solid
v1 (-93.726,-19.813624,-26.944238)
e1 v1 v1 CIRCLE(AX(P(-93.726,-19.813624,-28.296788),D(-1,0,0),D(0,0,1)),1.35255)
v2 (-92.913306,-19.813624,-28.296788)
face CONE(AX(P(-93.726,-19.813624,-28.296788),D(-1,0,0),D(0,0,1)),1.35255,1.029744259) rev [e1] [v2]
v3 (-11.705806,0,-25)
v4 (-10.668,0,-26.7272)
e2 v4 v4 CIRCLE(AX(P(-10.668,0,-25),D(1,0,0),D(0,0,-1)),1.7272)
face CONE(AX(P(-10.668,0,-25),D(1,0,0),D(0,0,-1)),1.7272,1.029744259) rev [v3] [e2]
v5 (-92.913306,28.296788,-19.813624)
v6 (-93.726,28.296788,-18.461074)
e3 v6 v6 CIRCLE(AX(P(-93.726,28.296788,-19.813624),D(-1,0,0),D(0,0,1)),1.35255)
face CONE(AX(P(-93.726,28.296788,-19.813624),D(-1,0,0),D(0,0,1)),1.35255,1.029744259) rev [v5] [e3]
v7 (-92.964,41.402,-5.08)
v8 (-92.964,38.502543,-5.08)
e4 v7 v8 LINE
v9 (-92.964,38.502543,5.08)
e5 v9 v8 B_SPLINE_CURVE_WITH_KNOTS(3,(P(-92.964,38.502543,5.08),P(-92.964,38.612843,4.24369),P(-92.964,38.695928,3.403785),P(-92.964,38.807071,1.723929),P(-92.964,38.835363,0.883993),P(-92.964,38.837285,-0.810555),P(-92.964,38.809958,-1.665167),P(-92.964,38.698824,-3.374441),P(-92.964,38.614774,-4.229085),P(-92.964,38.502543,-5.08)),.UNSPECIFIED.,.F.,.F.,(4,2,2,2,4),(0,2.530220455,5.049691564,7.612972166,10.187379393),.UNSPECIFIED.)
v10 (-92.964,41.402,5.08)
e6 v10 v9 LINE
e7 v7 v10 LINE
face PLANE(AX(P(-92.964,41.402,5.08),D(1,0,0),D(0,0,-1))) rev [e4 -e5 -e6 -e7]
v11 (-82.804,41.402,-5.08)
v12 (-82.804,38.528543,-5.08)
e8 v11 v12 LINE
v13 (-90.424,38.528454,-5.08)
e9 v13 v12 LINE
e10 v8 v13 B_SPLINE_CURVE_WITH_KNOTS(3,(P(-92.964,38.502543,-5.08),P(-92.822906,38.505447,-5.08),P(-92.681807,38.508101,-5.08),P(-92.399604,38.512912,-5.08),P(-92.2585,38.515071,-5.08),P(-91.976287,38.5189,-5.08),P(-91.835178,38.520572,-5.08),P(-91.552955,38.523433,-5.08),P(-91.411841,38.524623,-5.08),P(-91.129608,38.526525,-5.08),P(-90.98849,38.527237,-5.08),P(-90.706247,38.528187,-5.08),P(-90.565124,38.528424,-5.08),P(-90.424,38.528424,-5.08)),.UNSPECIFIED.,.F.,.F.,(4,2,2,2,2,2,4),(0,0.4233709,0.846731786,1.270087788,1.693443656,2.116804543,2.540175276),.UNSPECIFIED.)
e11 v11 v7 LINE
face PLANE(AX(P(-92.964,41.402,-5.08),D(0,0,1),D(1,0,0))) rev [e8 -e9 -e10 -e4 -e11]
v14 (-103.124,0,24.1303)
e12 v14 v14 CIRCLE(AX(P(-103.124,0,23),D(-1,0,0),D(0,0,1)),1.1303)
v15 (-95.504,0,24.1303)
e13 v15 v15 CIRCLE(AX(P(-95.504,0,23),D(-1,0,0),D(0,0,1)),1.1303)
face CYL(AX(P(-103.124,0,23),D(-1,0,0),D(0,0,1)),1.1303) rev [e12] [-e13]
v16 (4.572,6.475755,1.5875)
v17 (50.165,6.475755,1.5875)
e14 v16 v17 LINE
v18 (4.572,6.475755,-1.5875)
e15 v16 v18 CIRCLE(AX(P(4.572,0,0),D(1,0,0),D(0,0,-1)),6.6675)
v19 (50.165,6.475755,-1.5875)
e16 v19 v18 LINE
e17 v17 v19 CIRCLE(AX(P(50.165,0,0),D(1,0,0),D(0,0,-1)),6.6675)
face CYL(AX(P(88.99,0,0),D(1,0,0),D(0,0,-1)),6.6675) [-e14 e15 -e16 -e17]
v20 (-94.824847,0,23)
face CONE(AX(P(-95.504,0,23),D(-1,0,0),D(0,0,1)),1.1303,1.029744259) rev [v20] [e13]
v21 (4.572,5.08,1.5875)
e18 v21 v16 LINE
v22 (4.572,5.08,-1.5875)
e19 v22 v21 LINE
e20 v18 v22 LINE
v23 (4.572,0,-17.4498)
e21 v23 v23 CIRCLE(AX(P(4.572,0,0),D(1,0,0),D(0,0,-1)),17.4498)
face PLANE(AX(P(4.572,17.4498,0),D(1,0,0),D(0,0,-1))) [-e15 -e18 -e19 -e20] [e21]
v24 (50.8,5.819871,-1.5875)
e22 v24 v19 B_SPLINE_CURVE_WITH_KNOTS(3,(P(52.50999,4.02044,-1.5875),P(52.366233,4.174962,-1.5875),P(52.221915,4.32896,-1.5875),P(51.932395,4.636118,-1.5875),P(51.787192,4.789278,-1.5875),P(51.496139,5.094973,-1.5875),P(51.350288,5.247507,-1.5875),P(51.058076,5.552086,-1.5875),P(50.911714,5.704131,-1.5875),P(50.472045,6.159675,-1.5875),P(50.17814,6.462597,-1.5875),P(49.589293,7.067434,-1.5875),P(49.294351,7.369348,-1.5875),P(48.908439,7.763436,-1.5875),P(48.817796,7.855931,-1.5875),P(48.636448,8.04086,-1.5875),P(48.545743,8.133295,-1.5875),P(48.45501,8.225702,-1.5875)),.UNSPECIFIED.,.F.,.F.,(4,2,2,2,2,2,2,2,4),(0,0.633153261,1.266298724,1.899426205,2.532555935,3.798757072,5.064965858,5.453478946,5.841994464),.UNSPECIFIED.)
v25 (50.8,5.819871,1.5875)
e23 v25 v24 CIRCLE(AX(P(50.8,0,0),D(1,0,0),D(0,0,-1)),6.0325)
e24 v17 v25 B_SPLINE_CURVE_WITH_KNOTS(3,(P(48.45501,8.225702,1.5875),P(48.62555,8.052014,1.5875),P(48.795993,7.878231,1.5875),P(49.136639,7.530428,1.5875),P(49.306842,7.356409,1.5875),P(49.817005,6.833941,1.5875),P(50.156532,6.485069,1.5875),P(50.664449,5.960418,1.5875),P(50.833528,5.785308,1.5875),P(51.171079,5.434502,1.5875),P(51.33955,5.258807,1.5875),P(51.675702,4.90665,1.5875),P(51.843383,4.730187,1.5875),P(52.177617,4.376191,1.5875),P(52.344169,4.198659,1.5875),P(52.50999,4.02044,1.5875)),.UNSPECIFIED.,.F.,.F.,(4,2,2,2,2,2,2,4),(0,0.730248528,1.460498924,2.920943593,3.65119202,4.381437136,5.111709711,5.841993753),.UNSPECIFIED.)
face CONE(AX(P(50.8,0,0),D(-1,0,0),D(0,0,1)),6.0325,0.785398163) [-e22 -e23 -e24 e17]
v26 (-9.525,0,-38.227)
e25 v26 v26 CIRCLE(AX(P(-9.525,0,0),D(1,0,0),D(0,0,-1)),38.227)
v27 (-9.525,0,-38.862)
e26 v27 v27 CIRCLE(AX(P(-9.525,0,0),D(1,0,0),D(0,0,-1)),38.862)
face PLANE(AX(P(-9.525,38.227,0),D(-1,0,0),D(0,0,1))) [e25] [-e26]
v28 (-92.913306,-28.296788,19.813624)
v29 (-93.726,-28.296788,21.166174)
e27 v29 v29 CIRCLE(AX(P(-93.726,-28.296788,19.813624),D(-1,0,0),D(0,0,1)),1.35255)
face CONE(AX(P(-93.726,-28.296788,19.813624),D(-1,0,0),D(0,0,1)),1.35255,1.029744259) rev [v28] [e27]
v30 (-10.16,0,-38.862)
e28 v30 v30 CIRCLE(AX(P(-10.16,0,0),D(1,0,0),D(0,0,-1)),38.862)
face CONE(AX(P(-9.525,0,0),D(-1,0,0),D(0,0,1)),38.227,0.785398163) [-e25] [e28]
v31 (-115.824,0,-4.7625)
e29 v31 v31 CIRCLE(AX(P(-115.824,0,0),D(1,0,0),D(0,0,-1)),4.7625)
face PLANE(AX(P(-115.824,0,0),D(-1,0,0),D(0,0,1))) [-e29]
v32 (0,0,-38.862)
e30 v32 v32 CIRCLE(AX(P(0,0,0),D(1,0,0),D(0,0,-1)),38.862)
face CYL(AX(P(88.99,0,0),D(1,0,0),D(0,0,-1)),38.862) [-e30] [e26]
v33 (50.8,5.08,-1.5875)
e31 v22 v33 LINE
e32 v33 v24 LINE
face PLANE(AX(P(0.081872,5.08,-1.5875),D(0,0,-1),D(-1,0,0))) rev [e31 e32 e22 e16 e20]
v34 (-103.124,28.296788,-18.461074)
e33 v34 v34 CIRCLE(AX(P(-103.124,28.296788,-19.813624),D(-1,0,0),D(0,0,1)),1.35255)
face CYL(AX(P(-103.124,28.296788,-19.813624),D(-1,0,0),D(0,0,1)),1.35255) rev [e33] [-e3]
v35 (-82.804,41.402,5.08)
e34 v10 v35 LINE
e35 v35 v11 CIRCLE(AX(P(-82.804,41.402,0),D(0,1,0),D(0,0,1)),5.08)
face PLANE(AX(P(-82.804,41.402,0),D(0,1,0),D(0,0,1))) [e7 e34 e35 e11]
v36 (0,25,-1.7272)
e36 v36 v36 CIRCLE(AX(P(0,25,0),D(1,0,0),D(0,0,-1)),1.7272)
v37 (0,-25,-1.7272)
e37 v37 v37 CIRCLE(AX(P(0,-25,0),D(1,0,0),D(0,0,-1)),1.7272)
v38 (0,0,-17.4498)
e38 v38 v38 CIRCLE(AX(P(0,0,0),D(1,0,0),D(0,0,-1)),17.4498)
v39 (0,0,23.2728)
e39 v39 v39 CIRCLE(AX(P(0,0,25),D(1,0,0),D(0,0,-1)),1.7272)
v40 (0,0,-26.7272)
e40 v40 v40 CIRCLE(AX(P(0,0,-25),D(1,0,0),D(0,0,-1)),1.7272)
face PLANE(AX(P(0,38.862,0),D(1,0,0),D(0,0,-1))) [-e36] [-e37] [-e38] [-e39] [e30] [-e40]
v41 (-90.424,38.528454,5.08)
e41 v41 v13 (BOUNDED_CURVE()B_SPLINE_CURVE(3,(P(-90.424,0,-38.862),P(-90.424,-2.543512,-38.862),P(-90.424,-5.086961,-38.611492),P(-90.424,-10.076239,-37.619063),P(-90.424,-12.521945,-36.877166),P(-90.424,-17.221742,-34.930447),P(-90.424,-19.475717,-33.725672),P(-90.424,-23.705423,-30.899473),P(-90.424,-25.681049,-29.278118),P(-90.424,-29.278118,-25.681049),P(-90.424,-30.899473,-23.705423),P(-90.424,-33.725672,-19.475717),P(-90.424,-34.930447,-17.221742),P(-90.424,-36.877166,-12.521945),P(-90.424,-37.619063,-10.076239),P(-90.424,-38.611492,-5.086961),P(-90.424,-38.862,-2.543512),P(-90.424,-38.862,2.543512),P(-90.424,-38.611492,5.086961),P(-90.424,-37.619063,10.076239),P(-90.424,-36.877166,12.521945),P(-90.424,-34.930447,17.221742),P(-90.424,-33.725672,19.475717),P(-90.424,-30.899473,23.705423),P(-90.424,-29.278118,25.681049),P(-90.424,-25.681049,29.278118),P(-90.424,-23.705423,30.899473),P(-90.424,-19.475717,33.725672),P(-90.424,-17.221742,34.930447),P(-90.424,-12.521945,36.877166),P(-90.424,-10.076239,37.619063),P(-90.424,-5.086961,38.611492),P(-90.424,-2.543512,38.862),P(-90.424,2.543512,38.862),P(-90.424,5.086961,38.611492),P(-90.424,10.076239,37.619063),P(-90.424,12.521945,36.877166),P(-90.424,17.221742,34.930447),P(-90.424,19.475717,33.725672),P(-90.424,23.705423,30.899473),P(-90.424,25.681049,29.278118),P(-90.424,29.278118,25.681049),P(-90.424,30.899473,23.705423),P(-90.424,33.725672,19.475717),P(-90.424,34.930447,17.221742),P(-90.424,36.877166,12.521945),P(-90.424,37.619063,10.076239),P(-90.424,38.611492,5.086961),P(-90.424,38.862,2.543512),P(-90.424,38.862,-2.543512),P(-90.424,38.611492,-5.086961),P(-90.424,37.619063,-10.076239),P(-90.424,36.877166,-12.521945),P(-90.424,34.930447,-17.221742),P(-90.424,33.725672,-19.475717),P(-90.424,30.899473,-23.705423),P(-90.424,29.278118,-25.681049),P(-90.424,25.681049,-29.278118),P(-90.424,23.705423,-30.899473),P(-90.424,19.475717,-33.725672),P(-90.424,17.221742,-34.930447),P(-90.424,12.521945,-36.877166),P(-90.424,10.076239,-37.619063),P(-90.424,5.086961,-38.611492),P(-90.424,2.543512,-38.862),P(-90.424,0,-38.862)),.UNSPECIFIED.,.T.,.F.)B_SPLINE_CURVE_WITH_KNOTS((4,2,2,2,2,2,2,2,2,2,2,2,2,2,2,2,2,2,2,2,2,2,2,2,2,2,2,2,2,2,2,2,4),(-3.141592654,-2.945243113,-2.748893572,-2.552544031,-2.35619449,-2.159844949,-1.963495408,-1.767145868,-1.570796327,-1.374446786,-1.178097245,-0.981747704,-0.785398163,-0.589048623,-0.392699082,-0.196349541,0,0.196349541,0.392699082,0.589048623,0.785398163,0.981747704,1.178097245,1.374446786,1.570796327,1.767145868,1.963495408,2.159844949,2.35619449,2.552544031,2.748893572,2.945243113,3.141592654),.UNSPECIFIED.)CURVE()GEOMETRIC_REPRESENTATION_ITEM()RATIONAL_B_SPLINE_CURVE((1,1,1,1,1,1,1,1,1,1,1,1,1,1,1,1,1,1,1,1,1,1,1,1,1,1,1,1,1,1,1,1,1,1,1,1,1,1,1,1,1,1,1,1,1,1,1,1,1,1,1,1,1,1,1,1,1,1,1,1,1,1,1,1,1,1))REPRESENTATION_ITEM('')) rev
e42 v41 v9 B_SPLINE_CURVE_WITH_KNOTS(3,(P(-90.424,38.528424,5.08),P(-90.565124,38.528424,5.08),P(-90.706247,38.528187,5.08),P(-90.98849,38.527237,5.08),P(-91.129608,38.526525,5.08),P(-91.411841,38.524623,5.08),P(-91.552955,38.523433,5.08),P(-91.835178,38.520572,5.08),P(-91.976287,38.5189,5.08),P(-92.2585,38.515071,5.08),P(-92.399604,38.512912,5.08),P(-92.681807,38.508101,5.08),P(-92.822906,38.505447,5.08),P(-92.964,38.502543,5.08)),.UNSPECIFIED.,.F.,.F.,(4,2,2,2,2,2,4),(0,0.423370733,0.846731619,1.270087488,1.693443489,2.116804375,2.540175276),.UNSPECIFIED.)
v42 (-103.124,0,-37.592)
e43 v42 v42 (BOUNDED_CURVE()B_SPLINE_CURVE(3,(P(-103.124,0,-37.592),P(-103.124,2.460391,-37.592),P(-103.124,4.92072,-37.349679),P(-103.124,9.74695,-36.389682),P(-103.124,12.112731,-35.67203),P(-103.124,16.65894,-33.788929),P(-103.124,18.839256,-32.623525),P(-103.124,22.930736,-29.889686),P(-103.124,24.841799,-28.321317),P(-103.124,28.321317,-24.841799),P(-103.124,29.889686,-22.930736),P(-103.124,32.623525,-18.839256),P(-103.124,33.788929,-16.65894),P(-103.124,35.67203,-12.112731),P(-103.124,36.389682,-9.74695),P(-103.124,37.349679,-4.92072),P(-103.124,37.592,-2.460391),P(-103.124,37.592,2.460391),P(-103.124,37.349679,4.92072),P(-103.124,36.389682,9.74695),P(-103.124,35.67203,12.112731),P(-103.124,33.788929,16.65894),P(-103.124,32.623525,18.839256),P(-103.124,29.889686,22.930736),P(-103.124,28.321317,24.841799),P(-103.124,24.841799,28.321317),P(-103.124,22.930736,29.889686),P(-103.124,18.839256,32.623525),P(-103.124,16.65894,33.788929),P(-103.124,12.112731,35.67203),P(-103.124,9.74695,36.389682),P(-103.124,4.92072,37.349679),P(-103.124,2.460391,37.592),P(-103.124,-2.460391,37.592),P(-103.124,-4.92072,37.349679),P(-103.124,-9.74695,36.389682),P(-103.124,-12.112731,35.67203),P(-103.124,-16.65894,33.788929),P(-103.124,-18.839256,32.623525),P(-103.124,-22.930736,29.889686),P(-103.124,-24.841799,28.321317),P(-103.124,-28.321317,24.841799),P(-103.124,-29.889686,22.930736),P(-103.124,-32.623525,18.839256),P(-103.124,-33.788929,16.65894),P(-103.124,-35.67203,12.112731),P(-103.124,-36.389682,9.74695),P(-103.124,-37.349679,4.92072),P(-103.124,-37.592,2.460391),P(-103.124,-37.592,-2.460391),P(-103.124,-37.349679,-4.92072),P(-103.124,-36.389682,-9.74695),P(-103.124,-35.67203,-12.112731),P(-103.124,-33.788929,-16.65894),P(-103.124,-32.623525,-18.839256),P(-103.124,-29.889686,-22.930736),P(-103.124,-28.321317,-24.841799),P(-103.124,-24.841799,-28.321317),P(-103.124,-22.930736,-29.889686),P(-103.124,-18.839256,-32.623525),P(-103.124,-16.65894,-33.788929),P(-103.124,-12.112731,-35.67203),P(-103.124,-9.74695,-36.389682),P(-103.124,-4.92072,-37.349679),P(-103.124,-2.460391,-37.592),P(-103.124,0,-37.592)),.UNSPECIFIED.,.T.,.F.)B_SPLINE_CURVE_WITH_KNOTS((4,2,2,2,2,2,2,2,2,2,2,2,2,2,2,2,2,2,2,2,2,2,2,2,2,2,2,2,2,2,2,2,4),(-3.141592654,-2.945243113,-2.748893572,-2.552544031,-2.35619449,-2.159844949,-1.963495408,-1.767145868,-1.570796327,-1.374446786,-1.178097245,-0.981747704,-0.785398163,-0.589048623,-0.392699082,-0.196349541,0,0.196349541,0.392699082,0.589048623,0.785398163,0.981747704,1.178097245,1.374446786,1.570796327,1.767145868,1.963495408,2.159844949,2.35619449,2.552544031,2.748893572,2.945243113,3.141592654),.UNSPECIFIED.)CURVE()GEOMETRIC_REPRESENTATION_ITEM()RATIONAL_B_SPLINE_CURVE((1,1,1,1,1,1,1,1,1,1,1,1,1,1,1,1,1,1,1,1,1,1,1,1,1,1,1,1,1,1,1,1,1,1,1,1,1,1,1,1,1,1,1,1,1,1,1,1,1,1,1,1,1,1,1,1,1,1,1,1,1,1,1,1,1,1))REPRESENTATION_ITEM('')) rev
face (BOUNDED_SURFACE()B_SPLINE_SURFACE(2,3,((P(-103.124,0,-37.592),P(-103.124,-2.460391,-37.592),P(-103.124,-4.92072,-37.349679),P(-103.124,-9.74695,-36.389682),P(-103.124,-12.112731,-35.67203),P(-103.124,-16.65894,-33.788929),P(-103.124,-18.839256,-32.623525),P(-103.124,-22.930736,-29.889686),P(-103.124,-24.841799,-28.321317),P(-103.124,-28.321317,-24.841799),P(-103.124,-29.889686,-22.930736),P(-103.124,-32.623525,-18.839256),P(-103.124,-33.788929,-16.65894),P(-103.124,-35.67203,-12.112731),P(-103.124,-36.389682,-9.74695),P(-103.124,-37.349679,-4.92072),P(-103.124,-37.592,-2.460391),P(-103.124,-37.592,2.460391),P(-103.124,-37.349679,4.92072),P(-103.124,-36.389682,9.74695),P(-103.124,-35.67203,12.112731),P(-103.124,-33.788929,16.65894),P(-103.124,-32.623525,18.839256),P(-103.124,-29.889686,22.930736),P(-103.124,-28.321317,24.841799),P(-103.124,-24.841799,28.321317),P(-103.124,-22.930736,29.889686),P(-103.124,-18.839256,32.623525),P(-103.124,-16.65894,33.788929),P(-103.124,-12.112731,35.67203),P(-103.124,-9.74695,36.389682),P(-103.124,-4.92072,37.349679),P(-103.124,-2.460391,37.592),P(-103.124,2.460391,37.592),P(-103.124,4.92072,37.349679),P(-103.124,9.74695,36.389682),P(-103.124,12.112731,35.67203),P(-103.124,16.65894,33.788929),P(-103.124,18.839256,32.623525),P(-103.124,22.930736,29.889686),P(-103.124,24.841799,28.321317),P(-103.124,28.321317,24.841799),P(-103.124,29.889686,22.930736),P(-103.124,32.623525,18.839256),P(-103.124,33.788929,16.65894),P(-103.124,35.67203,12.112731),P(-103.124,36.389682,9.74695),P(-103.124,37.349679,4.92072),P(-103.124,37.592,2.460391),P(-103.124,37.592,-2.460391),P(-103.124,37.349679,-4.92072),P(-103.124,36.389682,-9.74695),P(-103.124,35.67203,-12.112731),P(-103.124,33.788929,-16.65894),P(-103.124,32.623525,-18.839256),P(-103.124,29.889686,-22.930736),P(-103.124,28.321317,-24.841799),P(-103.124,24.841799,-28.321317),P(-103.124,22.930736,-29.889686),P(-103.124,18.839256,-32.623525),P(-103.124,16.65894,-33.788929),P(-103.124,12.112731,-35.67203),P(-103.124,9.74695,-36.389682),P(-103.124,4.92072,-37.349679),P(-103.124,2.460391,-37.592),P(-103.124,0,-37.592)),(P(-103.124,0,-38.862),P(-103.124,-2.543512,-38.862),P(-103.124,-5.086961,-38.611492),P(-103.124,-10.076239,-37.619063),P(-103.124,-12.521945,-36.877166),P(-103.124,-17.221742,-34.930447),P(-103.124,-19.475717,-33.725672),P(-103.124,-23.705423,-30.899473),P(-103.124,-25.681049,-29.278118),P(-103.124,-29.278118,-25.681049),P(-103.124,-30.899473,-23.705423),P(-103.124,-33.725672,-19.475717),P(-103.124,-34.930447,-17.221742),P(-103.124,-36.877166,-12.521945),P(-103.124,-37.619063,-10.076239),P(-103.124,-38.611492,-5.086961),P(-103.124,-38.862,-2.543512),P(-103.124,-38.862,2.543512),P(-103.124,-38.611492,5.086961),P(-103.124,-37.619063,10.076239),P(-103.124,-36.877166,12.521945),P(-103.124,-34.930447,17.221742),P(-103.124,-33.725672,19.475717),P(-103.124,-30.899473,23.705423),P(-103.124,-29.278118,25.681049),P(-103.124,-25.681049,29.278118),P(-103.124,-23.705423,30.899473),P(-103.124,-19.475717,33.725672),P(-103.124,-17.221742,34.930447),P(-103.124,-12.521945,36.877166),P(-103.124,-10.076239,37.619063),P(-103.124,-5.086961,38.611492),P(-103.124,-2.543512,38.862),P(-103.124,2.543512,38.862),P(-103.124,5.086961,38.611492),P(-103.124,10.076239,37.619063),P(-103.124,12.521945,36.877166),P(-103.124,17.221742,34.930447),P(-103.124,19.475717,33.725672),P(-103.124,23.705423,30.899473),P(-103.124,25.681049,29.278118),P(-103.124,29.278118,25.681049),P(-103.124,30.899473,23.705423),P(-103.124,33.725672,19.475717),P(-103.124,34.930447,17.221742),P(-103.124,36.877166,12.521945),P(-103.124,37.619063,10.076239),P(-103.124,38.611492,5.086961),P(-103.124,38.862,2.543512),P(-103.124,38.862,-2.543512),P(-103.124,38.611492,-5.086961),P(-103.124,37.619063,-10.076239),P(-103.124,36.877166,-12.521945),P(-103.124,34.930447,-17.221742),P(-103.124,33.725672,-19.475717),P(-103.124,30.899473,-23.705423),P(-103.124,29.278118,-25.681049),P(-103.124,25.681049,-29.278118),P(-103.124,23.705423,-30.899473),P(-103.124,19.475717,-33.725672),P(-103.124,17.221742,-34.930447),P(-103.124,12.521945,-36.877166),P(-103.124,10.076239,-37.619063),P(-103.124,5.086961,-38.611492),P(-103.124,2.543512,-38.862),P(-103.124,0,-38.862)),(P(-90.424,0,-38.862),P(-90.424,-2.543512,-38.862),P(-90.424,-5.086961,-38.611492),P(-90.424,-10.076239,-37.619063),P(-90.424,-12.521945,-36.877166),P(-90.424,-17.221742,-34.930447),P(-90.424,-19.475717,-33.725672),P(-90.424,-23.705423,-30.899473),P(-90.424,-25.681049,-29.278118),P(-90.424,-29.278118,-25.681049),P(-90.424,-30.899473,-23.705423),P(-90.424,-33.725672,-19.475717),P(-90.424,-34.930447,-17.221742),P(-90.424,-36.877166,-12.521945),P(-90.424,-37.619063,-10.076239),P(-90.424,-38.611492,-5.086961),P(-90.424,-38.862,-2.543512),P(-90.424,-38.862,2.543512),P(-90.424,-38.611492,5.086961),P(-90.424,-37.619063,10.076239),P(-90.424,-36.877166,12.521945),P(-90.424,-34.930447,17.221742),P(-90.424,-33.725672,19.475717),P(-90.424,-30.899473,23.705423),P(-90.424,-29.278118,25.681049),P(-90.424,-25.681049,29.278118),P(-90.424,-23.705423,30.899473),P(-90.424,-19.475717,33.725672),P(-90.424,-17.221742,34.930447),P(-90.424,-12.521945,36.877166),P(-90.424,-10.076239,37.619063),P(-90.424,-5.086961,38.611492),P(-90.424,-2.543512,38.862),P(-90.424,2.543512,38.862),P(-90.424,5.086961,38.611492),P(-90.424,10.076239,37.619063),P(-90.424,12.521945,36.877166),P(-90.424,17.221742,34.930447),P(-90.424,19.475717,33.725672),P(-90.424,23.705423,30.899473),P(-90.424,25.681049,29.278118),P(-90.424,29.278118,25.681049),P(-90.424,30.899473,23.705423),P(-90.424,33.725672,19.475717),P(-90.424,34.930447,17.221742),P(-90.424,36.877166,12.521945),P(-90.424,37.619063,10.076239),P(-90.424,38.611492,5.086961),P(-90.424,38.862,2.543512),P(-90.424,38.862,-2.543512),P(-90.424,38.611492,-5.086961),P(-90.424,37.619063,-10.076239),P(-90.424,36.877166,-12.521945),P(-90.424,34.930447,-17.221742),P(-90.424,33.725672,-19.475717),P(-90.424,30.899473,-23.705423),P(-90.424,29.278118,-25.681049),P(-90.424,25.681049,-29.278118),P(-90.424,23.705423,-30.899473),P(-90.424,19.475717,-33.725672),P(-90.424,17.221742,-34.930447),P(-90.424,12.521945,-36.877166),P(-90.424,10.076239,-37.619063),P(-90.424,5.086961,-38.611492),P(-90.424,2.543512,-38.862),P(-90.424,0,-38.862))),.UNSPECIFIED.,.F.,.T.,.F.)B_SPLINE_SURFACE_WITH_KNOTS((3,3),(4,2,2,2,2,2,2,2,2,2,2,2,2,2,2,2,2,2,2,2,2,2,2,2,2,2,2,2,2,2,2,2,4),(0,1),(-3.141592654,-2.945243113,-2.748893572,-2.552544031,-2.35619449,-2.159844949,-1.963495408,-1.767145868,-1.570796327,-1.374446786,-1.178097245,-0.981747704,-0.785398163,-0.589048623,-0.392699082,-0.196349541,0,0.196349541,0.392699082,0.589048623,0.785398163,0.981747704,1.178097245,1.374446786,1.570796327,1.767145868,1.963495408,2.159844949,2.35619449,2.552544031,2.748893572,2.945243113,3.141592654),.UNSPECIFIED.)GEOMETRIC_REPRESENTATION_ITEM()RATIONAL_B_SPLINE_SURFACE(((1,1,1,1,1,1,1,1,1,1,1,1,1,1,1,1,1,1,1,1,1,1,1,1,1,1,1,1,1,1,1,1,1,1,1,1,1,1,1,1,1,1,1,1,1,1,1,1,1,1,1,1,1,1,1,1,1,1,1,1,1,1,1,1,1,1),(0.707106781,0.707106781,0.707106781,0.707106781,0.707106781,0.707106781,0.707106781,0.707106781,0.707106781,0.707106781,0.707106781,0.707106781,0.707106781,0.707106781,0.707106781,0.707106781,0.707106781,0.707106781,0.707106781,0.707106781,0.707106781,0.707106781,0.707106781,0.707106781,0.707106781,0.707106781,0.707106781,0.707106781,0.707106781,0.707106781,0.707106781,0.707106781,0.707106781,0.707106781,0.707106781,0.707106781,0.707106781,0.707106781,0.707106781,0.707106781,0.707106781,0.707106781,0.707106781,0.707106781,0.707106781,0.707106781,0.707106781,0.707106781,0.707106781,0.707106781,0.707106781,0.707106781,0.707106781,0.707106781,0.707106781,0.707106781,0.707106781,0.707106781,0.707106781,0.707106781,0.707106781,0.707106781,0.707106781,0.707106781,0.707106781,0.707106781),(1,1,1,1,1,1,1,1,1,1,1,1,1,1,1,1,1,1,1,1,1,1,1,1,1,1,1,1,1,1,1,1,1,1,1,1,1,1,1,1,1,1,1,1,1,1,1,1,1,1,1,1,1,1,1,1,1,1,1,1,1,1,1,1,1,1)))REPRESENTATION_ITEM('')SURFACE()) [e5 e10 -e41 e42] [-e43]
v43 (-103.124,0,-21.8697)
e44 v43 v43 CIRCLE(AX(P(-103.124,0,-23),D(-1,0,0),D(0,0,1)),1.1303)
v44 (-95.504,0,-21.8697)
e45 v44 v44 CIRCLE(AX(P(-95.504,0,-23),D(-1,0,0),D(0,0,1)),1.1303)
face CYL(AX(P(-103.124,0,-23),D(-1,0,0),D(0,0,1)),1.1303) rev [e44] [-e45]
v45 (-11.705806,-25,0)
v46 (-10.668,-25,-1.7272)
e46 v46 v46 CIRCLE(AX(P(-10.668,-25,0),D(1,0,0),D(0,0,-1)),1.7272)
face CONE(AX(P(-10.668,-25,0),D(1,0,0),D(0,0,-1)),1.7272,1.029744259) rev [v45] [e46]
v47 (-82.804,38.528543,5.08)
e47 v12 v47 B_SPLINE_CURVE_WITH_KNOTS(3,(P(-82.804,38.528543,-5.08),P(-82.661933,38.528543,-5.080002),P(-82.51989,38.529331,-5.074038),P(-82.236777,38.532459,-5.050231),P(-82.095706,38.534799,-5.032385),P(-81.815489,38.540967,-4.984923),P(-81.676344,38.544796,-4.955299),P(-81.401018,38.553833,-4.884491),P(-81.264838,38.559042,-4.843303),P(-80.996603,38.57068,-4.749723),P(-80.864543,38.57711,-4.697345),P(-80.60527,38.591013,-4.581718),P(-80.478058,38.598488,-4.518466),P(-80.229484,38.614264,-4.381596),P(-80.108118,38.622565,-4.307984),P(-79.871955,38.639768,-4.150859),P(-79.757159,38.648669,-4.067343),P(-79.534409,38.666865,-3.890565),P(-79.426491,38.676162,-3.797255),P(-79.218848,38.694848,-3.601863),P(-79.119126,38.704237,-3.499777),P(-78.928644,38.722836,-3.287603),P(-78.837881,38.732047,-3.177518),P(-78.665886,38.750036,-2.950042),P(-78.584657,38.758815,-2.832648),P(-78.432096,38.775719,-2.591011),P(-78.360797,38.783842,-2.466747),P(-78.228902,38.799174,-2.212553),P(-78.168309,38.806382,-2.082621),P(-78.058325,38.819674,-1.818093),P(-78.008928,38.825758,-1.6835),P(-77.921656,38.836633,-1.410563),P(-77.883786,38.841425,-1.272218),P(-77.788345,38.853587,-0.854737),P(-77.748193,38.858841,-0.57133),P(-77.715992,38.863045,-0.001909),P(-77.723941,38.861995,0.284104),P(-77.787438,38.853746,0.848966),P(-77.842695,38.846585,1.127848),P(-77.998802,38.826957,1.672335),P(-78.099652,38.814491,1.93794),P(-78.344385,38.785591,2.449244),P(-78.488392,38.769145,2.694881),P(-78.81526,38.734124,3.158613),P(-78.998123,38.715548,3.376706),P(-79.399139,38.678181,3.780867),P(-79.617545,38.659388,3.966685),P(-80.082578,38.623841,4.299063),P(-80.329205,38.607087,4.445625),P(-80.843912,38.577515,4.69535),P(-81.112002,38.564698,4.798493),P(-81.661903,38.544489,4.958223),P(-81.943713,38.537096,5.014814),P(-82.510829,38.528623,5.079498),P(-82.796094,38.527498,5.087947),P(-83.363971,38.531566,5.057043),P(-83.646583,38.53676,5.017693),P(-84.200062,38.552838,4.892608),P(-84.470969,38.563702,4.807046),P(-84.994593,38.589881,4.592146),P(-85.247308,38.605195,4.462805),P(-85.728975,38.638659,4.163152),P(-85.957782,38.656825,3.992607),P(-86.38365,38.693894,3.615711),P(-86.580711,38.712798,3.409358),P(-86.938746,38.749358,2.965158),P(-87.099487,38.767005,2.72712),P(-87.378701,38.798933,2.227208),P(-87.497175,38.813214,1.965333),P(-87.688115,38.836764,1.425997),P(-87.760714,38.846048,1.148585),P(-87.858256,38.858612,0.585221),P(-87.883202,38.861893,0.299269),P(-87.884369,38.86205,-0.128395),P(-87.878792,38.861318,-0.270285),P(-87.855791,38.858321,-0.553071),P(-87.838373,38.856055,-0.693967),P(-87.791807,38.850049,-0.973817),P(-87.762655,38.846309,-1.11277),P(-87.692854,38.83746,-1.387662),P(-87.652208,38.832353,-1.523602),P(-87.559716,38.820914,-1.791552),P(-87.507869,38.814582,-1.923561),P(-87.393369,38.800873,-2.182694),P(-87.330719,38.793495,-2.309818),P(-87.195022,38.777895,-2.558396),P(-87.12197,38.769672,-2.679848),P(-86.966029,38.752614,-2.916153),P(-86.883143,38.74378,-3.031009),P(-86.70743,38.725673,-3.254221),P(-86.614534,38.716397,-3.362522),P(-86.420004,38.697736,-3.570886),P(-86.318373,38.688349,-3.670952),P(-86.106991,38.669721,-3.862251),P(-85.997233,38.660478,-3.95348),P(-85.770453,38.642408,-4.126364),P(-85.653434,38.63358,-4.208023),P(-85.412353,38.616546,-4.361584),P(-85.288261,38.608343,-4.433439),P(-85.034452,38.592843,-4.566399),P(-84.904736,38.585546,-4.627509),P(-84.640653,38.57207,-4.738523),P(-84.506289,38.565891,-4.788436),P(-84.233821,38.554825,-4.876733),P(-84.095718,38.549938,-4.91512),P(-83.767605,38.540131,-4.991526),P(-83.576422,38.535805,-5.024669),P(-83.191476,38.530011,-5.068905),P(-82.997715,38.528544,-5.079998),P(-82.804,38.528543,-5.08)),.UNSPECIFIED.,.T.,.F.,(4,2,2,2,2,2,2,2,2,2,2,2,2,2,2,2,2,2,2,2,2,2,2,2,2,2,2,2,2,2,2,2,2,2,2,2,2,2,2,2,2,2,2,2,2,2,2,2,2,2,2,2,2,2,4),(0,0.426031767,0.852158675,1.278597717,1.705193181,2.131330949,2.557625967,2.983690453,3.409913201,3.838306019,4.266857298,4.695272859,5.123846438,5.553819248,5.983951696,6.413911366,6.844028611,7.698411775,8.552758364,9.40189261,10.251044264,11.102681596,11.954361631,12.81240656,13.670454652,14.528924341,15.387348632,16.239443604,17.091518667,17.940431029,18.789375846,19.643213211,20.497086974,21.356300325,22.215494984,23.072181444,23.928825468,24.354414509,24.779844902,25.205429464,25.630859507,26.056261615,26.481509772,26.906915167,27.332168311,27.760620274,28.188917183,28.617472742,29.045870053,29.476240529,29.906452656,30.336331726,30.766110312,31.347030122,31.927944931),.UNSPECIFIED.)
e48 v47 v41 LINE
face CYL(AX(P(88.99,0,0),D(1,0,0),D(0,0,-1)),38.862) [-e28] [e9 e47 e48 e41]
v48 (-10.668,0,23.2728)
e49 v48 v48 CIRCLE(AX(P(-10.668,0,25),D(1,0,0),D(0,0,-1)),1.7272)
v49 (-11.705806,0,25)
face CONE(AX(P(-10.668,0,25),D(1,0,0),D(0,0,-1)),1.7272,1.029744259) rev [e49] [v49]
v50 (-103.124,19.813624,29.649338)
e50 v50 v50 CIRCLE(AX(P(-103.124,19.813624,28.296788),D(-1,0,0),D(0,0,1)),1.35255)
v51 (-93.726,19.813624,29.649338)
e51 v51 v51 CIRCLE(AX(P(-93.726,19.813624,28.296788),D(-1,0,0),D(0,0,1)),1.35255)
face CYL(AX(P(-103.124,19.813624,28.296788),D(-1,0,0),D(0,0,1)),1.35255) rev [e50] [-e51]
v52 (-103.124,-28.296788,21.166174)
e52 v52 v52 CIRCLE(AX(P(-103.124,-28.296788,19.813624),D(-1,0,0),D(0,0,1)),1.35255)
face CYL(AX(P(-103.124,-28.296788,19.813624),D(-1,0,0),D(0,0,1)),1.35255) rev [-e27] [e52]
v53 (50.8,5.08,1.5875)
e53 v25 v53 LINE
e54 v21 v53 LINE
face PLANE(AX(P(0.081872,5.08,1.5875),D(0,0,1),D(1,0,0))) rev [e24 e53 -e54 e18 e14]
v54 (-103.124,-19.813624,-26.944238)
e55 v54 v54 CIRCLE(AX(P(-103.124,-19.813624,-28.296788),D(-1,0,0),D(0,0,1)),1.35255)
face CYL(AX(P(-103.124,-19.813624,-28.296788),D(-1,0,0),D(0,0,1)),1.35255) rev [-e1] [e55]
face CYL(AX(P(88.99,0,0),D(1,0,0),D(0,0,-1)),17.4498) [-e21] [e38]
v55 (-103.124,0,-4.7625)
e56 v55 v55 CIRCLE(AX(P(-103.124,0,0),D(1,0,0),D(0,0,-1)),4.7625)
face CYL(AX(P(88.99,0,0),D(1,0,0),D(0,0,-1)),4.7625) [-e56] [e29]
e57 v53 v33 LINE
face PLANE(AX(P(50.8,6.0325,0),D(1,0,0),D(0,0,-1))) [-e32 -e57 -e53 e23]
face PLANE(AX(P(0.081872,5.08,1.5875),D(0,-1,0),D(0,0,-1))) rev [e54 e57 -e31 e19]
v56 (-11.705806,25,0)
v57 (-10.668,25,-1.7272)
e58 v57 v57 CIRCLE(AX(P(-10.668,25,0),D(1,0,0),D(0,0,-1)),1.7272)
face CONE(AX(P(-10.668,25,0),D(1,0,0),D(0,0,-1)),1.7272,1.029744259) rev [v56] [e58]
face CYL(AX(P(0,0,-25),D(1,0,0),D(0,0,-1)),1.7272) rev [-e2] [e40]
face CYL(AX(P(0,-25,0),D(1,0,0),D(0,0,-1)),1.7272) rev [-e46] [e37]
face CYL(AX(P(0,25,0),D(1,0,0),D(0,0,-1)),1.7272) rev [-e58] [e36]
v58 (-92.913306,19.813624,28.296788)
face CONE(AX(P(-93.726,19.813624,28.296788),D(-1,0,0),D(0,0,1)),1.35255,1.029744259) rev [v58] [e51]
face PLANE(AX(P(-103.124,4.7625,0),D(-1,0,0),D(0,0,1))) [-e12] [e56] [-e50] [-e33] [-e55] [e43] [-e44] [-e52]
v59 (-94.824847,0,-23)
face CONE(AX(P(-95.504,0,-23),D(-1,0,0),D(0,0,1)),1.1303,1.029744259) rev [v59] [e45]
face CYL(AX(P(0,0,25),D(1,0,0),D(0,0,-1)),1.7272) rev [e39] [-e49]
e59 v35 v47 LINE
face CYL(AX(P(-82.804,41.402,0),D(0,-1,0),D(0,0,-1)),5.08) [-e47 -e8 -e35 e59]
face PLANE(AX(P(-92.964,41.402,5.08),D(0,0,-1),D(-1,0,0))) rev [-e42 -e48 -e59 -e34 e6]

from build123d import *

# Parameters (mm, degrees)
FILLET1_SIZE              = 1.27
FILLET1_SIZE_2            = 12.7
SKETCH3_W                 = 3.175
SKETCH3_H                 = 3.175
CUT_EXTRUDE1_DEPTH        = 46.228
F_4_40_TAPPED_HOLE1_D     = 2.2606
F_4_40_TAPPED_HOLE1_DEPTH = 7.62
F_4_40_TAPPED_HOLE1_TIP   = 0.679152758
CIRPATTERN1_COUNT         = 4
BOSS_EXTRUDE1_DEPTH       = 41.402


# Read off the part's stored shape, not the designer's step: #6-32 Tapped Hole1
with BuildPart() as part:
    # Sketch2 → Revolve1 (revolve)
    with BuildSketch(Plane.XY, mode=Mode.PRIVATE) as revolve1_sk:
        Polygon((50.8, 0), (-115.824, 0), (-115.824, 4.7625), (-103.124, 4.7625), (-103.124, 38.862), (-10.16, 38.862), (-9.525, 38.227), (-9.525, 38.862), (0, 38.862), (0, 17.4498), (4.572, 17.4498), (4.572, 6.6675), (50.165, 6.6675), (50.8, 6.0325), align=None)
    revolve(revolve1_sk.sketch.rotate(Axis((88.99, 0, 0), (-1, 0, 0)), 90), axis=Axis((88.99, 0, 0), (-1, 0, 0)))

    # Fillet1
    # an asymmetric fillet: 12.7, 1.27 mm, written as the material it takes off along each edge
    with BuildSketch(Plane(origin=(-103.124, 0, 0), x_dir=(0, 0, -1), z_dir=(0, 1, 0))) as fillet1_piece_1:
        with BuildLine():
            Bezier((38.862 - FILLET1_SIZE, 0), (38.862, 0), (38.862, -FILLET1_SIZE_2), weights=[1, 0.707106781, 1])
            Line((38.862, -FILLET1_SIZE_2), (38.862, 0))
            Line((38.862, 0), (38.862 - FILLET1_SIZE, 0))
        make_face()
    revolve(axis=Axis((-103.124, 0, 0), (-1, 0, 0)), mode=Mode.SUBTRACT)

    # Sketch3 → Cut-Extrude1 (cut)
    with BuildSketch(Plane(origin=(50.8, 0, 0), x_dir=(0, 0, -1), z_dir=(1, 0, 0))):
        with Locations((0, 6.6675)):
            Rectangle(SKETCH3_W, SKETCH3_H)
    extrude(amount=-CUT_EXTRUDE1_DEPTH, mode=Mode.SUBTRACT)

    # Sketch8 → #8-32 Tapped Hole3 (revolve, cut)
    with BuildSketch(Plane(origin=(0, 0, -25), x_dir=(0, 0, -1), z_dir=(0, 1, 0))):
        Polygon((0, 0), (0, 11.705806461), (1.7272, 10.668), (1.7272, 0), align=None)
    f_8_32_tapped_hole3 = revolve(axis=Axis((6.35, 0, -25), (-1, 0, 0)), mode=Mode.SUBTRACT)

    # #6-32 Tapped Hole1 outline → #6-32 Tapped Hole1 (revolve, cut)
    with BuildSketch(Plane(origin=(0, 19.813624417, 28.296788218), x_dir=(0, 1, 0), z_dir=(0, 0, -1))):
        Polygon((1.35255, -93.726), (0, -92.91330597), (0, -103.124), (1.35255, -103.124), align=None)
    f_6_32_tapped_hole1 = revolve(axis=Axis((0, 19.813624417, 28.296788218), (1, 0, 0)), mode=Mode.SUBTRACT)

    # #4-40 Tapped Hole1
    with Locations(Plane.ZY.offset(103.124)):
        with Locations((-23, 0), (23, 0)):
            Hole(F_4_40_TAPPED_HOLE1_D / 2, depth=F_4_40_TAPPED_HOLE1_DEPTH)
            with Locations((0, 0, -(F_4_40_TAPPED_HOLE1_DEPTH + F_4_40_TAPPED_HOLE1_TIP / 2))):  # 118° drill point
                Cone(0, F_4_40_TAPPED_HOLE1_D / 2, F_4_40_TAPPED_HOLE1_TIP, mode=Mode.SUBTRACT)

    # CirPattern1: #8-32 Tapped Hole3, #6-32 Tapped Hole1 ×4 about axis
    cirpattern1_axis = Axis((0, 0, 0), (1, 0, 0))
    add([f_8_32_tapped_hole3.rotate(cirpattern1_axis, i * 360 / CIRPATTERN1_COUNT) for i in range(1, CIRPATTERN1_COUNT)], mode=Mode.SUBTRACT)
    add([f_6_32_tapped_hole1.rotate(cirpattern1_axis, i * 360 / CIRPATTERN1_COUNT) for i in range(1, CIRPATTERN1_COUNT)], mode=Mode.SUBTRACT)

    # Sketch12 → Boss-Extrude1 (add)
    with BuildSketch(Plane(origin=(0, 0, 0), x_dir=(1, 0, 0), z_dir=(0, 1, 0))):
        with BuildLine():
            Line((-92.964, -5.08), (-82.804, -5.08))
            ThreePointArc((-82.804, -5.08), (-77.724, 0), (-82.804, 5.08))
            Line((-82.804, 5.08), (-92.964, 5.08))
            Line((-92.964, 5.08), (-92.964, -5.08))
        make_face()
    extrude(amount=BOSS_EXTRUDE1_DEPTH)


solid = part.part
